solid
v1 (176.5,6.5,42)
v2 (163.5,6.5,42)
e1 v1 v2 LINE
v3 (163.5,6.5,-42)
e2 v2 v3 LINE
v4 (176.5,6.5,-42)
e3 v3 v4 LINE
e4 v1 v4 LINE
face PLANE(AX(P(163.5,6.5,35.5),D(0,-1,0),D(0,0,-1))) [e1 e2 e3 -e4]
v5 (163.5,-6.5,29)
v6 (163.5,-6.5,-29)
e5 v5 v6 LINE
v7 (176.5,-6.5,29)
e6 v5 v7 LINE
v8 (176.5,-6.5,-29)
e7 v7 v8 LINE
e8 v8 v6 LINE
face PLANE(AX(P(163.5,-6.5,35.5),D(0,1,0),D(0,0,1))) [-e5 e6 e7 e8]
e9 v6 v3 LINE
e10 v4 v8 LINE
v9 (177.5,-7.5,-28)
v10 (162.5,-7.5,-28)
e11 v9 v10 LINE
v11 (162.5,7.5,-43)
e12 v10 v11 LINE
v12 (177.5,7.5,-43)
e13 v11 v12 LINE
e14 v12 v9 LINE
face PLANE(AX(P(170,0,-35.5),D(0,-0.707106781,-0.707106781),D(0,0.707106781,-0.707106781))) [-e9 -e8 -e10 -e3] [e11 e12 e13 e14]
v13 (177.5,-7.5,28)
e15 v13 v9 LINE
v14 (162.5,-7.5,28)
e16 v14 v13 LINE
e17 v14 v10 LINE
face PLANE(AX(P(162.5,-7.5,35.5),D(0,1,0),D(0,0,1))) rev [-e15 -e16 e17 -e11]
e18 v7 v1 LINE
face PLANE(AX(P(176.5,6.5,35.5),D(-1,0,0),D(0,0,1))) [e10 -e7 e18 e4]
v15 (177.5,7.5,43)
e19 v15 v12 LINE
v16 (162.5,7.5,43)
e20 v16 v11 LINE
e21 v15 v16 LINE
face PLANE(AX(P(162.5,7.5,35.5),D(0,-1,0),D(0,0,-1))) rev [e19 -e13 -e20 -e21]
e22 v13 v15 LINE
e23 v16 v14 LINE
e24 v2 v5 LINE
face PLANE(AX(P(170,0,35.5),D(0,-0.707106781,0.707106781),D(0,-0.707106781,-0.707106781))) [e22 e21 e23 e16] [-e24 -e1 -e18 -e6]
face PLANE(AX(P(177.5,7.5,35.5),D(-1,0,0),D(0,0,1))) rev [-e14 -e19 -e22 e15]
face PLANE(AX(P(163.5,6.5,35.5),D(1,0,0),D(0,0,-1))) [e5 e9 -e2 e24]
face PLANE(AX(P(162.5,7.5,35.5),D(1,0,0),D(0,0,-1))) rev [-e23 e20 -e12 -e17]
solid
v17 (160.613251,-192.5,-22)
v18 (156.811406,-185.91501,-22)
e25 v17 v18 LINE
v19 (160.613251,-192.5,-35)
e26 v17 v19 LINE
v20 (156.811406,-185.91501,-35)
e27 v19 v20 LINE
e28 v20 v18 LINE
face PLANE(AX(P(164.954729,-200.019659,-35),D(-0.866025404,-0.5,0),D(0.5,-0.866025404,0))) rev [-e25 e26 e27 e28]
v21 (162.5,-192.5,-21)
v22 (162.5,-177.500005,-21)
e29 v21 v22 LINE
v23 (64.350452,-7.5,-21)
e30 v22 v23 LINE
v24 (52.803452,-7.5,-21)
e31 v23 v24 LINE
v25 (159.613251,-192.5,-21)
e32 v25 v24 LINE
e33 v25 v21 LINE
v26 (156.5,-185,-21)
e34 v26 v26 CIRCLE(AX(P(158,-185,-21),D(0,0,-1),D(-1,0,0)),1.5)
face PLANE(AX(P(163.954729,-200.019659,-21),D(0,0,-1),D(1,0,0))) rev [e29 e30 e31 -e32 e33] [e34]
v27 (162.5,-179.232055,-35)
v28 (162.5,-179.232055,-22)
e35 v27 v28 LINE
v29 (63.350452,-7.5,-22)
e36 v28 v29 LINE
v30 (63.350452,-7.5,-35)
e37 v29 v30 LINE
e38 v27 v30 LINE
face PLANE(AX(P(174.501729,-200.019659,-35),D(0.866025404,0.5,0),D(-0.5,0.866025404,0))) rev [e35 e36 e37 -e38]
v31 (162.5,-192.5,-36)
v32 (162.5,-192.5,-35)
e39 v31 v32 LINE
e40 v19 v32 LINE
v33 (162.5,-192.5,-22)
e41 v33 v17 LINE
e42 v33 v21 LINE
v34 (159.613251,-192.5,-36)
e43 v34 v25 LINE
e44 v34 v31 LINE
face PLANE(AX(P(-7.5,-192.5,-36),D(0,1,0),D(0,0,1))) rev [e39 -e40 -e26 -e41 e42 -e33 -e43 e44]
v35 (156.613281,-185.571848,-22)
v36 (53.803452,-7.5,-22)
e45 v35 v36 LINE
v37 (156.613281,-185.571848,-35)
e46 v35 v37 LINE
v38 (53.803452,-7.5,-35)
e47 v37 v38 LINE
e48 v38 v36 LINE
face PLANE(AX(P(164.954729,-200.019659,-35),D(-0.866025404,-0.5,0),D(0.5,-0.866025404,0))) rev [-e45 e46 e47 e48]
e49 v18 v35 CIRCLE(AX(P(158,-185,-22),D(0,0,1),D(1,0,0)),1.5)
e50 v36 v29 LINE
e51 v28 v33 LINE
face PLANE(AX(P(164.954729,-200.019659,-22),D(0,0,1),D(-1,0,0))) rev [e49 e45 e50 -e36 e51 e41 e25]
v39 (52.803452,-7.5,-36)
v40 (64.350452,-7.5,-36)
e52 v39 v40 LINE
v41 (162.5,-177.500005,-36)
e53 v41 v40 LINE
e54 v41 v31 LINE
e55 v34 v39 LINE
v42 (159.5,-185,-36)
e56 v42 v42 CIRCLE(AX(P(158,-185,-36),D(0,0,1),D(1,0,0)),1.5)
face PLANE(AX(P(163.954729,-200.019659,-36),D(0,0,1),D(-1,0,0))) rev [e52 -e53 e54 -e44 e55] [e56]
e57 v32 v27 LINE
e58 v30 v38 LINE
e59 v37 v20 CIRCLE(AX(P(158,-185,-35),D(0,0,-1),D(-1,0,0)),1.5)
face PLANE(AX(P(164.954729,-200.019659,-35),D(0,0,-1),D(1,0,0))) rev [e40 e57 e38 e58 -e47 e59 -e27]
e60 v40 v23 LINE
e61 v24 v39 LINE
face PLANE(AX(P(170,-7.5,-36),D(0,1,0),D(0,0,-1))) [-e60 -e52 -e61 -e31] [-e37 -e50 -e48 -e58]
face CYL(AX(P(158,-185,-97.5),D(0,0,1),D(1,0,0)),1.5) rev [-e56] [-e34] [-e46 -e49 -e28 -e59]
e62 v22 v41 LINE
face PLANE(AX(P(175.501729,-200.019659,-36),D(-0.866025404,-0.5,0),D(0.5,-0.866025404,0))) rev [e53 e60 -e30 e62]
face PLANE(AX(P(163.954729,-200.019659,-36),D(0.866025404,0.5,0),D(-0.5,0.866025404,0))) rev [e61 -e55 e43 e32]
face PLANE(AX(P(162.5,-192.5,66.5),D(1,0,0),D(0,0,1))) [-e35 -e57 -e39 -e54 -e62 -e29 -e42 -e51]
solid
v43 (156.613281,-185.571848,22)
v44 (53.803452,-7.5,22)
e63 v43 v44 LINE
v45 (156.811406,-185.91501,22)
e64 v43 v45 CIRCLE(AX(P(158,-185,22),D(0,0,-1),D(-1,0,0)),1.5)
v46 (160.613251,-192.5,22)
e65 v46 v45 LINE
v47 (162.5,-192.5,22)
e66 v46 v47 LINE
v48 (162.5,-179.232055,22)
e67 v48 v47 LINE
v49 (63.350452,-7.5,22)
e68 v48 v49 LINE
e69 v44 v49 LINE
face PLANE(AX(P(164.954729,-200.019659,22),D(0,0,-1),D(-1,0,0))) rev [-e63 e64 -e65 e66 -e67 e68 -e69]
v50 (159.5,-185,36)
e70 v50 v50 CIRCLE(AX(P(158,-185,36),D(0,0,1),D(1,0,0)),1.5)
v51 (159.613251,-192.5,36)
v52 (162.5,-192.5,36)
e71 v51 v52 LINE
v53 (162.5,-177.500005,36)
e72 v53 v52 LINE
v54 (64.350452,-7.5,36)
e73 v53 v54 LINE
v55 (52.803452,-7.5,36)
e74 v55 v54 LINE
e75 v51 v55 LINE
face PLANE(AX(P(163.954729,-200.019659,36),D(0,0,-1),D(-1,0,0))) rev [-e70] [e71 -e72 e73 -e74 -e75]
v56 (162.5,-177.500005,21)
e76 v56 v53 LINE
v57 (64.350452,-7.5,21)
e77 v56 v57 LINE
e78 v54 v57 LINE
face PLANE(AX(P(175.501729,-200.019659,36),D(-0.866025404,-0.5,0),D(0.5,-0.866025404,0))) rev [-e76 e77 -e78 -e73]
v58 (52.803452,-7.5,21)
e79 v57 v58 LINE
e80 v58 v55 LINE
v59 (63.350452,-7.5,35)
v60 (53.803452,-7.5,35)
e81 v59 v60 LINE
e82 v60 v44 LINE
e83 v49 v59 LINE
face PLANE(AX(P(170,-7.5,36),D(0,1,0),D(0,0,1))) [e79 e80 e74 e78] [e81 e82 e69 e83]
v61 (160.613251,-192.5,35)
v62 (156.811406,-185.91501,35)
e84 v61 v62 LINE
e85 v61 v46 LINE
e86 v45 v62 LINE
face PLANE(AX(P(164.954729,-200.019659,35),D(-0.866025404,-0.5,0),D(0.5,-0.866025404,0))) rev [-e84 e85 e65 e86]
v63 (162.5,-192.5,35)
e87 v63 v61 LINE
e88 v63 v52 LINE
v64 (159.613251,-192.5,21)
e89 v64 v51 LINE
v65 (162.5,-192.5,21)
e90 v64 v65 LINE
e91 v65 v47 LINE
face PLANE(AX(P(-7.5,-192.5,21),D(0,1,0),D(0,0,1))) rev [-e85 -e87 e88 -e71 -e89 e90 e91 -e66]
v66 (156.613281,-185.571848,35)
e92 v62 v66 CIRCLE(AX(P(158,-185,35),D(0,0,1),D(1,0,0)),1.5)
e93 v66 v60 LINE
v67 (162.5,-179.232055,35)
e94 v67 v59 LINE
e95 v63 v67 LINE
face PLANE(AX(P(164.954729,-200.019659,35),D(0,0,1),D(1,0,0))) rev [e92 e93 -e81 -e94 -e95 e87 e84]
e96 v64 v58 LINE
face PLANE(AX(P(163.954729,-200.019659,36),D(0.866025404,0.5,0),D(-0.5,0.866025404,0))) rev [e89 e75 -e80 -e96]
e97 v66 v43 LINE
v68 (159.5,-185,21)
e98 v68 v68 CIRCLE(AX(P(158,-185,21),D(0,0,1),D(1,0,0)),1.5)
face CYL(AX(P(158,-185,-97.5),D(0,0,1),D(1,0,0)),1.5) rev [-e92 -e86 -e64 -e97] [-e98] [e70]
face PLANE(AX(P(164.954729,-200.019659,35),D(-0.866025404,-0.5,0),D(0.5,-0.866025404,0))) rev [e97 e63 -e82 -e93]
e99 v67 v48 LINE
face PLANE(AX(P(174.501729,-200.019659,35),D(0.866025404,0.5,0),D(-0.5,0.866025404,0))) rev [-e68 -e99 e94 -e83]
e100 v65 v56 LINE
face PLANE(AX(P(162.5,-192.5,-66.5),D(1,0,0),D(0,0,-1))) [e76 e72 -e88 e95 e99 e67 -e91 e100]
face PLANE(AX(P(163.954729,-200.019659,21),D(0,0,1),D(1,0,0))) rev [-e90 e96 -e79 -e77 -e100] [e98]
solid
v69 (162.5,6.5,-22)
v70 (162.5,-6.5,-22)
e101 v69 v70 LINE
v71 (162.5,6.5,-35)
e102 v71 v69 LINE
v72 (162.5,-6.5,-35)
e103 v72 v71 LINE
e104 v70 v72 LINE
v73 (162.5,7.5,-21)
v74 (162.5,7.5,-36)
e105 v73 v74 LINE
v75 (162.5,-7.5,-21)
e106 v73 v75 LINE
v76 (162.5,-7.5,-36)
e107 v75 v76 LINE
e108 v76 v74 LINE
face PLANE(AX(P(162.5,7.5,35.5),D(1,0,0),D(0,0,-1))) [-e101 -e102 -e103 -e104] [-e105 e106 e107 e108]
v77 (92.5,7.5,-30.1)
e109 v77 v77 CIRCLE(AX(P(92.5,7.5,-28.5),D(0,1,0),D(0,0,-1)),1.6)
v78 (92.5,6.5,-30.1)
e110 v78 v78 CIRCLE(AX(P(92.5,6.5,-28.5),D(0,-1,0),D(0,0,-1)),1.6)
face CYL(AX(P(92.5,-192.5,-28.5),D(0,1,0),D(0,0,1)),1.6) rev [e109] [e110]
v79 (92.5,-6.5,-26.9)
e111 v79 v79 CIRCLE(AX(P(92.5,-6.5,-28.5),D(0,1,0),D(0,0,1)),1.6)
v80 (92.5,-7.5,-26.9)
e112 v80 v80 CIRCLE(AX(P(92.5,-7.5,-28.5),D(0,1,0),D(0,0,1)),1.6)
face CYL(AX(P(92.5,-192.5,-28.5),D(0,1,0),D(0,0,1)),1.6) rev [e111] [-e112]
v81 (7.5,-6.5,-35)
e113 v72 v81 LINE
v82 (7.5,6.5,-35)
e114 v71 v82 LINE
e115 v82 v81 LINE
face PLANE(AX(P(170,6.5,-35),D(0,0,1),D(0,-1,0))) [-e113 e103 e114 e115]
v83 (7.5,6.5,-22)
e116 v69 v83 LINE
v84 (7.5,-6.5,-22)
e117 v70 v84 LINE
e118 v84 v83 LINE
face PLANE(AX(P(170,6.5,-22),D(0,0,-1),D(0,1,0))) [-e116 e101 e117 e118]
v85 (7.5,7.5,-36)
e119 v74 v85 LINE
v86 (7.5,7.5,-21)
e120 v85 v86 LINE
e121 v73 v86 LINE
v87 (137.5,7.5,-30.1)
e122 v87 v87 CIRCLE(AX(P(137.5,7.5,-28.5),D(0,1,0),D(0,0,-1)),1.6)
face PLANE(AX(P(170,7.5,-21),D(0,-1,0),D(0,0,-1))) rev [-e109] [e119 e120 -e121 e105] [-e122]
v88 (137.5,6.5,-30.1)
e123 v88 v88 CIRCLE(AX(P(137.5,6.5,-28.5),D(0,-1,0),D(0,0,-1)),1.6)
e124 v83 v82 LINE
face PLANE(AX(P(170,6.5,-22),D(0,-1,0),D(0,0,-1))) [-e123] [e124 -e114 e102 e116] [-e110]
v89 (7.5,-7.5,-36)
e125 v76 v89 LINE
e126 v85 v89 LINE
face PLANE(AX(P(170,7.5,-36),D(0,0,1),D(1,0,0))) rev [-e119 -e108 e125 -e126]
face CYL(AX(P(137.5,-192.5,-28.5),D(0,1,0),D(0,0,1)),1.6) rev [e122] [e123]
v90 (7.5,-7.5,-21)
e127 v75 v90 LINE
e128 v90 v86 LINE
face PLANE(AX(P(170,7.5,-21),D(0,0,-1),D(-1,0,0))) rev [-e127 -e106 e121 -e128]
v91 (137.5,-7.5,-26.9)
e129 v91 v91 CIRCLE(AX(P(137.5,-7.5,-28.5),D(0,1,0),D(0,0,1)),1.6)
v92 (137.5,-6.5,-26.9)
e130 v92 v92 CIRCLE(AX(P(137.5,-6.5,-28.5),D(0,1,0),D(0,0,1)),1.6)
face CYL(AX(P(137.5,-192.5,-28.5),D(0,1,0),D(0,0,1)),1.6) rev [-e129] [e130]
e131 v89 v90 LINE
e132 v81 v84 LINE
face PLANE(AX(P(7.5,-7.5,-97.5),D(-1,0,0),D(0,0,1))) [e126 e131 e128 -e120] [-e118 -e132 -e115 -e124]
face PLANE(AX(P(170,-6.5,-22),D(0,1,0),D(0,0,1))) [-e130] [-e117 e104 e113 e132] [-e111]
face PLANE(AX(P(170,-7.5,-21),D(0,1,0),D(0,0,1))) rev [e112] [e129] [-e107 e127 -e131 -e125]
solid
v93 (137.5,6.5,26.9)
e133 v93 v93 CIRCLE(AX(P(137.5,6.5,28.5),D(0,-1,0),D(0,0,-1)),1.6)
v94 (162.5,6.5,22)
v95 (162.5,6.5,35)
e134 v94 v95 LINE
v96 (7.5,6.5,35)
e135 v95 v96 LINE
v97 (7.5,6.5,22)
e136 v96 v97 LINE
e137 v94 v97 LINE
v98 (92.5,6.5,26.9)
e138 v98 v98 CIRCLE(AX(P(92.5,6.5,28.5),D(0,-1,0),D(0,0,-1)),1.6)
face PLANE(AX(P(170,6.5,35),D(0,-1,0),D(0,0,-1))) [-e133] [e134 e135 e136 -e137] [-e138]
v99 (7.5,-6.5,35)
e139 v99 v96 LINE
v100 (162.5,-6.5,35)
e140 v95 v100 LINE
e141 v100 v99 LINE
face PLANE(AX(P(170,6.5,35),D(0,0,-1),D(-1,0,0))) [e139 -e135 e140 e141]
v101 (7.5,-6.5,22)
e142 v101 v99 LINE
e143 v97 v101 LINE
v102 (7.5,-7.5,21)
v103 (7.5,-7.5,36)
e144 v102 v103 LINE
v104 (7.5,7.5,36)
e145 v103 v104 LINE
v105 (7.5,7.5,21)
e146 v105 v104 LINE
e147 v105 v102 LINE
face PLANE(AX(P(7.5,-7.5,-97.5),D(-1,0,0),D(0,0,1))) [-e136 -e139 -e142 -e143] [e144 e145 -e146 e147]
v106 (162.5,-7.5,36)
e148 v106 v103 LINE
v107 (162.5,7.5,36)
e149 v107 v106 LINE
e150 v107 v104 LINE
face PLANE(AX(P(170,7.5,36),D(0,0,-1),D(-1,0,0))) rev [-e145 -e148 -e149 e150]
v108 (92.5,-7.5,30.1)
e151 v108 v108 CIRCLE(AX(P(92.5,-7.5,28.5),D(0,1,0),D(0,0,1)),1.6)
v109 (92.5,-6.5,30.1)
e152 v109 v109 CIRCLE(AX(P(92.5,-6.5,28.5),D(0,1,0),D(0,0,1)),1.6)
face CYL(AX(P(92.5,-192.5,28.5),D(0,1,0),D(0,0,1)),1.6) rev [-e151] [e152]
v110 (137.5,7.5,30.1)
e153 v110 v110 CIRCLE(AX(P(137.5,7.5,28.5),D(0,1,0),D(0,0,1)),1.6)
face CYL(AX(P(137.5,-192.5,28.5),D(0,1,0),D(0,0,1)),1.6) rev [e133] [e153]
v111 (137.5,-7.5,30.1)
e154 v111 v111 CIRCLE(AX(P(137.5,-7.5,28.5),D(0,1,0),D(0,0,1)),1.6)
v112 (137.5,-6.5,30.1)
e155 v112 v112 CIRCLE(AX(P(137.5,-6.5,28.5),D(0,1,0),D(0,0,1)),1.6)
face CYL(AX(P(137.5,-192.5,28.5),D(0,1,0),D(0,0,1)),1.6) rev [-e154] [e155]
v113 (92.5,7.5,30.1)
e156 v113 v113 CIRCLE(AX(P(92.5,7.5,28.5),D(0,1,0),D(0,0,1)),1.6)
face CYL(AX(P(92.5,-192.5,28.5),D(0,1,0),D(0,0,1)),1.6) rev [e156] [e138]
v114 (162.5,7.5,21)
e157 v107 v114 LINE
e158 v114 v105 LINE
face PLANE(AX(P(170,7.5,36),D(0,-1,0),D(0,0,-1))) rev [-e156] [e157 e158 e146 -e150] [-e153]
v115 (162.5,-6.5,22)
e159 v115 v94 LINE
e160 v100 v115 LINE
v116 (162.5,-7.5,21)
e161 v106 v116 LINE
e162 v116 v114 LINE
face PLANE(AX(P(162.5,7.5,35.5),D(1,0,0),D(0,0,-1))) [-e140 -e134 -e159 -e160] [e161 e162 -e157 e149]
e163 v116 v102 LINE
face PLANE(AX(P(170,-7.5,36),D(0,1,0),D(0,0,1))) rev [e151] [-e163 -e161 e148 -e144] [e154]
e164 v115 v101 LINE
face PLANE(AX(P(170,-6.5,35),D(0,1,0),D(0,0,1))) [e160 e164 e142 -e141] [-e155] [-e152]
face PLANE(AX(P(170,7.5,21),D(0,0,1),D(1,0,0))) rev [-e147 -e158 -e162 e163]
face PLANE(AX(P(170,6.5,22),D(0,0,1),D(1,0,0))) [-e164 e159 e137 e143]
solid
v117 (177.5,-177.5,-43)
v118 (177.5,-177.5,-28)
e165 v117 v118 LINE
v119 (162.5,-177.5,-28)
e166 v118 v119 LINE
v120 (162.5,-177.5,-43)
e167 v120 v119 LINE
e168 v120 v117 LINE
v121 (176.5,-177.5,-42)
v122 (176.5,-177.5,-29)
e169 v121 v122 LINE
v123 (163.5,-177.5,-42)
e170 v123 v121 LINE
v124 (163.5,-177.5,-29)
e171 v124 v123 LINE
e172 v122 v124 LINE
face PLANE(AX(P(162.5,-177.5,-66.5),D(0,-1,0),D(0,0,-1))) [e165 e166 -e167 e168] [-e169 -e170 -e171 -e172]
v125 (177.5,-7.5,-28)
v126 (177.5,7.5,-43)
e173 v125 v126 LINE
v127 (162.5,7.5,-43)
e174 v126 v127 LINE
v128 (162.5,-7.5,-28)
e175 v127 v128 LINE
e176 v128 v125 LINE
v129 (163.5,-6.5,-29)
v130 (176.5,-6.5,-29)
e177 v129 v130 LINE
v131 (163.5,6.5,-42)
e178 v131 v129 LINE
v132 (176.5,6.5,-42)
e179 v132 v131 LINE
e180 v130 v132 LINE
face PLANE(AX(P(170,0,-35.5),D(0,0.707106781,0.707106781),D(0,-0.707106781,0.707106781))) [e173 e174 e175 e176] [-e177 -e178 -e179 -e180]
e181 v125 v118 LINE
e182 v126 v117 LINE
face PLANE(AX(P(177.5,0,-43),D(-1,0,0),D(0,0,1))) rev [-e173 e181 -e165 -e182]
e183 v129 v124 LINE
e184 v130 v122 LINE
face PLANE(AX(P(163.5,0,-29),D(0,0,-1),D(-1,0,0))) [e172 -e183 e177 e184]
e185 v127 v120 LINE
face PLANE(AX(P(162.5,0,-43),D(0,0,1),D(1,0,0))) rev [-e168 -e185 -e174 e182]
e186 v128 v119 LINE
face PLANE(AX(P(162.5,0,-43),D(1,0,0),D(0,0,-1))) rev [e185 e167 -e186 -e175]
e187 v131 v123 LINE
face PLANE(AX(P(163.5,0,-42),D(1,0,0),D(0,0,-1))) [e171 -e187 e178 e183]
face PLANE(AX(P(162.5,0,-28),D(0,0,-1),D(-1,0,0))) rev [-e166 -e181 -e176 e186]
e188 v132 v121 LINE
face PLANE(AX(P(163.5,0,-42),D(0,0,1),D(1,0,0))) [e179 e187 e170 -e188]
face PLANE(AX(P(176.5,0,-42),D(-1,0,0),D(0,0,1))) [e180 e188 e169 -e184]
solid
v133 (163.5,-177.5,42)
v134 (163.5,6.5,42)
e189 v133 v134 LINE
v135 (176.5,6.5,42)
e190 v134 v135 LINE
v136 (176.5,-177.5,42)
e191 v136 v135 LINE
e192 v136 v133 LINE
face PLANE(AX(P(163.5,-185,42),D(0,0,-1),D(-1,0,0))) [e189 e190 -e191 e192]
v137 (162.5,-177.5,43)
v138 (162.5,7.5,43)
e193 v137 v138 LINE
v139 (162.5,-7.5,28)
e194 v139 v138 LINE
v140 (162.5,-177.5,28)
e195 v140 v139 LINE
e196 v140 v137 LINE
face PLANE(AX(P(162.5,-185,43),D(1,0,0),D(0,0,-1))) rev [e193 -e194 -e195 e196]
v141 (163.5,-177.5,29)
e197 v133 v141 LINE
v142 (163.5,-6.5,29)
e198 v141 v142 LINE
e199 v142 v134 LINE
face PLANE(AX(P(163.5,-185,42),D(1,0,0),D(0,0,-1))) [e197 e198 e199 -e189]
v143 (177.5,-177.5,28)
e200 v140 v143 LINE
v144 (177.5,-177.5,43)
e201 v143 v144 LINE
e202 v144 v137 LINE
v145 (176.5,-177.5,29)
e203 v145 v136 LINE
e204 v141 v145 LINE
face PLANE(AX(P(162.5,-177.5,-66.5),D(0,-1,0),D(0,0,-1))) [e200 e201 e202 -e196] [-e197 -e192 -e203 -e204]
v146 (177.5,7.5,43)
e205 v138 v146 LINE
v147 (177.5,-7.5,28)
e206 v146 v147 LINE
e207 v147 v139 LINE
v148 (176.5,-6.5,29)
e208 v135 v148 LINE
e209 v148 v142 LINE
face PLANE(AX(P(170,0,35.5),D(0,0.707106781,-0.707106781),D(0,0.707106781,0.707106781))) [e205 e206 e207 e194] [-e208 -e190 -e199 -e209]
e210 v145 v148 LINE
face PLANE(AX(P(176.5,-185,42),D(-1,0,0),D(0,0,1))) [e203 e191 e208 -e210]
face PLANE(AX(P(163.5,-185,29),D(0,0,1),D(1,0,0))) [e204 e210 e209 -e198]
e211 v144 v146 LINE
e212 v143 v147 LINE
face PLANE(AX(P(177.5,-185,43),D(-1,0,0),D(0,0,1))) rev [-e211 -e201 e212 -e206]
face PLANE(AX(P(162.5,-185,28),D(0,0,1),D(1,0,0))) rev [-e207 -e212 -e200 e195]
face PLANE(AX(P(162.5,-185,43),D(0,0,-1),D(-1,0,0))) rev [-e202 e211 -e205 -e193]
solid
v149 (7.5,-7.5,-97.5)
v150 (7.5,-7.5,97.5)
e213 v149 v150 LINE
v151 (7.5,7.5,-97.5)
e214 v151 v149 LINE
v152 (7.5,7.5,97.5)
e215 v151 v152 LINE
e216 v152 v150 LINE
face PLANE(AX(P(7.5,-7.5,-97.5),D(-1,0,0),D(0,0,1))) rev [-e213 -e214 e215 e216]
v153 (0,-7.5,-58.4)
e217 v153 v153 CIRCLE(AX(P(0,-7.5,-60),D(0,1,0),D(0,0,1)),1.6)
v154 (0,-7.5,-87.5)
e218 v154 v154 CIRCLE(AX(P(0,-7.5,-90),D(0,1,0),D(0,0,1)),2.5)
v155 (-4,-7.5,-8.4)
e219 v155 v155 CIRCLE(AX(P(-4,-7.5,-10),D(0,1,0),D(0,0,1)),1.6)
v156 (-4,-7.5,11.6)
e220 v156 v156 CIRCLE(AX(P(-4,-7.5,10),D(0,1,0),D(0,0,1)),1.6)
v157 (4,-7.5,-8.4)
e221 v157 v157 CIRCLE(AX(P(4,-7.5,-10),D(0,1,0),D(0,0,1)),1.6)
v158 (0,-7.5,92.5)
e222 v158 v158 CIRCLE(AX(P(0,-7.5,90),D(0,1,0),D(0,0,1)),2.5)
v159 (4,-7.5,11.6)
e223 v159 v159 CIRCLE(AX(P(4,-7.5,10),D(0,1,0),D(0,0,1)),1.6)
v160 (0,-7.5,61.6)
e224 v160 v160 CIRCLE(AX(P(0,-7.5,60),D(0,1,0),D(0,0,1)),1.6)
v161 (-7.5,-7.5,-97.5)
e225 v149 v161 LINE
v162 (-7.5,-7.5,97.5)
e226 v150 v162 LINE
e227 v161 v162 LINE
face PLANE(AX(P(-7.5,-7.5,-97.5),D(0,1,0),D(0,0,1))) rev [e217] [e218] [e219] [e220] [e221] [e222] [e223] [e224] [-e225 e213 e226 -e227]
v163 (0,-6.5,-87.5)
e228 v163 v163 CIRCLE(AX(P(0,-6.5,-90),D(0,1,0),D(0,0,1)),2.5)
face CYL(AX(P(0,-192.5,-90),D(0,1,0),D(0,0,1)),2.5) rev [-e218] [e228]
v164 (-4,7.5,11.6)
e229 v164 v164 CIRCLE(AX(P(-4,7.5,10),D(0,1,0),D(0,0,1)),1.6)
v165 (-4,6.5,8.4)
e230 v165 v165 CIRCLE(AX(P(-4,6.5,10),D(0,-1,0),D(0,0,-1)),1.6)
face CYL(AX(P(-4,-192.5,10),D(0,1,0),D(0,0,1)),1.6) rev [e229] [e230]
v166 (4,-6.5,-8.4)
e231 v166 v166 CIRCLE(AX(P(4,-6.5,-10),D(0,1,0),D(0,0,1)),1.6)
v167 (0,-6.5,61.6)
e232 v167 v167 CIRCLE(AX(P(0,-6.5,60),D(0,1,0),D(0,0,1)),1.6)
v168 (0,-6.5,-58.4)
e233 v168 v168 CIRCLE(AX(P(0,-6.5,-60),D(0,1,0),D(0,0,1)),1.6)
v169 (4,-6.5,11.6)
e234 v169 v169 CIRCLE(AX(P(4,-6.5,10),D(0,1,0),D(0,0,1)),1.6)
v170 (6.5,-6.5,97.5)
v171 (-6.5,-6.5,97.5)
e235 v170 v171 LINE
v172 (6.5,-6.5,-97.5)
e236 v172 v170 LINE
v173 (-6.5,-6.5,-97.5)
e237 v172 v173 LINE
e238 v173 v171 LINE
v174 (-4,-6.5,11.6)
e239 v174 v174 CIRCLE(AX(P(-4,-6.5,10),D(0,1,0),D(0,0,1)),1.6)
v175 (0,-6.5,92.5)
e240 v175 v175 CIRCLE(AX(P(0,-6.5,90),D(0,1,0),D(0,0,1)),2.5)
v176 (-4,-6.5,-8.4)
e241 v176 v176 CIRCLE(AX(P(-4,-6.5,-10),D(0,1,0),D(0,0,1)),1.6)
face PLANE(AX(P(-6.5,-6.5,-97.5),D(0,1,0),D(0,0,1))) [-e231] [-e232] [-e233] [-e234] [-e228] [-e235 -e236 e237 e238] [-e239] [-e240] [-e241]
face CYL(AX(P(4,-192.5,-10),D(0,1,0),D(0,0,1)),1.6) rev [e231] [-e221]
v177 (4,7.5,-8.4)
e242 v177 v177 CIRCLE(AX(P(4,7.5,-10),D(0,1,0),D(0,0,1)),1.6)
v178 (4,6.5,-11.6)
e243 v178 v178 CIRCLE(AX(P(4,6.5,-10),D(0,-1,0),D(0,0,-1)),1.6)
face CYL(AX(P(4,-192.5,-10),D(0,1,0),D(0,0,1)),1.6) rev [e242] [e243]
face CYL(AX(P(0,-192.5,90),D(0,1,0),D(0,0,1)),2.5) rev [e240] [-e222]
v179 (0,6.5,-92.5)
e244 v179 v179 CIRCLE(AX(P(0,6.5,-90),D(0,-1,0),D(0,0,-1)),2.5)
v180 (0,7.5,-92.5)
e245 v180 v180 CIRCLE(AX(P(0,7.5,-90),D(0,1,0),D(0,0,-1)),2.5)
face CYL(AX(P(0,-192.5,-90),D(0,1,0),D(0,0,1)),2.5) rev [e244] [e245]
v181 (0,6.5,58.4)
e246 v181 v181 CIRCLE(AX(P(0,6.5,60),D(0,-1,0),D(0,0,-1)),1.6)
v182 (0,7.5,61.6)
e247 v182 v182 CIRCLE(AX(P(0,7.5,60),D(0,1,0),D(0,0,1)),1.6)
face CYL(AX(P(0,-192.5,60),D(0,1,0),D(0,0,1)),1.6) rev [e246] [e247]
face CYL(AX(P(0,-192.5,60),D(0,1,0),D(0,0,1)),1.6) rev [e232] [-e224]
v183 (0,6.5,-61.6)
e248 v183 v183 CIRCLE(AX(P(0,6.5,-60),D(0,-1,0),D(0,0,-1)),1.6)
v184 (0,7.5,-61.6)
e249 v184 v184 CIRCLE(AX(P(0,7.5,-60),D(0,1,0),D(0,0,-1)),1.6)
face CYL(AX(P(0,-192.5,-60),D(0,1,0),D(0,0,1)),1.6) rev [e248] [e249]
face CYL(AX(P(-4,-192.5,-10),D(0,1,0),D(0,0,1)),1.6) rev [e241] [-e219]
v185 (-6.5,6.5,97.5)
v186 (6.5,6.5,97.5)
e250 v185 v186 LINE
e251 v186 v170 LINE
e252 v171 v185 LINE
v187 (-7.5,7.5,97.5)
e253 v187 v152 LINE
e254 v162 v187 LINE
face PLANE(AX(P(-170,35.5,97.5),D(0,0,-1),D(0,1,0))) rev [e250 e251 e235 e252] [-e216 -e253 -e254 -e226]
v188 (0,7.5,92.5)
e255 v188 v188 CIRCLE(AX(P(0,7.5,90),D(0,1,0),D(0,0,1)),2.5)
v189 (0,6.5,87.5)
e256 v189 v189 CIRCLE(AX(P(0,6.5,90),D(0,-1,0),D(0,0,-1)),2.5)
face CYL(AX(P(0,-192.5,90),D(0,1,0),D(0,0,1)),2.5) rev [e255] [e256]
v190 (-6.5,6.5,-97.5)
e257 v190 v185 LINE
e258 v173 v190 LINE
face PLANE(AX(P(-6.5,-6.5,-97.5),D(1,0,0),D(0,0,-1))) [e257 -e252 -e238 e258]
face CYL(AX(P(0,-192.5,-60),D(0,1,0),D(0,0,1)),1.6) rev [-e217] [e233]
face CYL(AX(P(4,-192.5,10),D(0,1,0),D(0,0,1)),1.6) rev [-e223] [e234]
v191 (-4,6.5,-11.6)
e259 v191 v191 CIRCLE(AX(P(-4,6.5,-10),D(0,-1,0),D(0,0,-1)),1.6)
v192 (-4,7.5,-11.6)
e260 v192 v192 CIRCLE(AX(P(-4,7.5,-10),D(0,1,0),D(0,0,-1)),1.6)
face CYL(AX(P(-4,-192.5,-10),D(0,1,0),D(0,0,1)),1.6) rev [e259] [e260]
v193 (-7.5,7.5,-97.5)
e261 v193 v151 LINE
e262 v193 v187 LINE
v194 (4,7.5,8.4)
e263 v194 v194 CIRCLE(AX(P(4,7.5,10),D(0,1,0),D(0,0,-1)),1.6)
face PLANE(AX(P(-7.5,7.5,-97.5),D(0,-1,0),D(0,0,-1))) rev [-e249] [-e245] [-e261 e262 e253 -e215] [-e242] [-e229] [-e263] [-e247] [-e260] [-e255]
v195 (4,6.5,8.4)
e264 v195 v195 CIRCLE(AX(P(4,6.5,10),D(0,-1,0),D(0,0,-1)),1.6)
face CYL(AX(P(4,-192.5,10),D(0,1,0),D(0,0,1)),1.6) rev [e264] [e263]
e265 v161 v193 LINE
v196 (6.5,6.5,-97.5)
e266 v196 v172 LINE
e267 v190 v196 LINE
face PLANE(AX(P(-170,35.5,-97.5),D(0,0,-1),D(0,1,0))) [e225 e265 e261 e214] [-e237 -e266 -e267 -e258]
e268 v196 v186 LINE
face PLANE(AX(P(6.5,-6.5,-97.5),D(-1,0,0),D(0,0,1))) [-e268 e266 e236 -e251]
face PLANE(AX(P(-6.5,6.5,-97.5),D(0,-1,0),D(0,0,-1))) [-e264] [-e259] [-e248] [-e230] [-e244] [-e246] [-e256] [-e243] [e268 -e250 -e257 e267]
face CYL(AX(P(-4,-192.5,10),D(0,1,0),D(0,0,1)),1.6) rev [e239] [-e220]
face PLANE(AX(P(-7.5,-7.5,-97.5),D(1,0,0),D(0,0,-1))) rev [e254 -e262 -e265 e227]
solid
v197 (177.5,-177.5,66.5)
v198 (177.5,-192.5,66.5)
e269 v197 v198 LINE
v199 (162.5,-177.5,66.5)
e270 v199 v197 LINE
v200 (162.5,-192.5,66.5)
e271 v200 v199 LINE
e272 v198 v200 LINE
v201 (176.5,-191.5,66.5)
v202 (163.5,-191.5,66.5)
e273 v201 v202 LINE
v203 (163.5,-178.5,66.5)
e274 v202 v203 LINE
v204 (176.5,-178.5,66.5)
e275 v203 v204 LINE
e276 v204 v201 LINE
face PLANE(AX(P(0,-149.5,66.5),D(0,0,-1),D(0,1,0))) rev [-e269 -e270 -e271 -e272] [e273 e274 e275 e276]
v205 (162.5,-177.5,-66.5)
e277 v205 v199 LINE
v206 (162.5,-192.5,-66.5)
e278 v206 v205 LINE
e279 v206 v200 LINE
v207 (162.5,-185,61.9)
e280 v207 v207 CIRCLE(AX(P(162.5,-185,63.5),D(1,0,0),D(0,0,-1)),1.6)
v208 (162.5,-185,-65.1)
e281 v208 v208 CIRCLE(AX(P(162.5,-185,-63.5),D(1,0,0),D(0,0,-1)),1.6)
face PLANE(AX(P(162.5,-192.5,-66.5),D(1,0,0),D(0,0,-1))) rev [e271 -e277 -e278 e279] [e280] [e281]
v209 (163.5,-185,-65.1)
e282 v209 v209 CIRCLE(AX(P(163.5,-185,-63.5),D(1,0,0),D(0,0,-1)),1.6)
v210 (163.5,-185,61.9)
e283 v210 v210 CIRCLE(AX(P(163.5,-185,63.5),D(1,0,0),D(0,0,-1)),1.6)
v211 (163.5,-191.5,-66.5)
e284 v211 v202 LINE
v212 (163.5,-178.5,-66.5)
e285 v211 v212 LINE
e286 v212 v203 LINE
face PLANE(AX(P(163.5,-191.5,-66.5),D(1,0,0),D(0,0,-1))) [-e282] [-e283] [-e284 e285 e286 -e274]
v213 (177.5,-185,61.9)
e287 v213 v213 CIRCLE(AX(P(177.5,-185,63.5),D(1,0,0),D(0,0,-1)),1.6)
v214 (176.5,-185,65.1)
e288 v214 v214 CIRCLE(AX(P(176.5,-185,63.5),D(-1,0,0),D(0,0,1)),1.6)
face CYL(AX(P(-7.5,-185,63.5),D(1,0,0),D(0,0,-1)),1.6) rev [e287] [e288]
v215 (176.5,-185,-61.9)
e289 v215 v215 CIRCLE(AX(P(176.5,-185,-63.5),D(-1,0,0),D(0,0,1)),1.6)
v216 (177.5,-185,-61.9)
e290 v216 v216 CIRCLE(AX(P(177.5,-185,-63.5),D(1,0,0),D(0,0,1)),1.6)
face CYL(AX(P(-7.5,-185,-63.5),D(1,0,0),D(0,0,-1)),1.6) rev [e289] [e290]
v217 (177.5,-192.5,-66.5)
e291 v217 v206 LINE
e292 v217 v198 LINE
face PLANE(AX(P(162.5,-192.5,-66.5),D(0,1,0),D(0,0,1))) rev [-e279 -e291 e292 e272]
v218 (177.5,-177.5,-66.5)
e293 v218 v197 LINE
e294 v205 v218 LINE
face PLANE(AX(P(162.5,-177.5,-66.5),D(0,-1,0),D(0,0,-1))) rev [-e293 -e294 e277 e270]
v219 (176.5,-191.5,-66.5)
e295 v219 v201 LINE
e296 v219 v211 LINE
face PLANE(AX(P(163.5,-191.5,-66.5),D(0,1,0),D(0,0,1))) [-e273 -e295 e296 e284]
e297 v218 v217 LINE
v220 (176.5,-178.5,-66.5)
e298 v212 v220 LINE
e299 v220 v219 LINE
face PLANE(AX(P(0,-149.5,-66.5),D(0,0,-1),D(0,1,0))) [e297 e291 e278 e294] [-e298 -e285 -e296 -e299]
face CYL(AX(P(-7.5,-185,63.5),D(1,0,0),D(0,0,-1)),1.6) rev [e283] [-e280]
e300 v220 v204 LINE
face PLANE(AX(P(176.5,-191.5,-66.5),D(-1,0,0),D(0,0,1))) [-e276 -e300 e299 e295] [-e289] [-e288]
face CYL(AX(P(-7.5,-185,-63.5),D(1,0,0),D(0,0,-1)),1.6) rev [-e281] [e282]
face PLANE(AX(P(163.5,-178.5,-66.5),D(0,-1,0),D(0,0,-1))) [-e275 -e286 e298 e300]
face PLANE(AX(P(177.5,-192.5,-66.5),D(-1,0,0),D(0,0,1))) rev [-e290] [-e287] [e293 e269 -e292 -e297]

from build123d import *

# Parameters (mm, degrees)
SKETCH1_ON_SEGMENT_1_W       = 15
SKETCH1_ON_SEGMENT_1_H       = 15
SKETCH1_ON_SEGMENT_1_W_2     = 13
SKETCH1_ON_SEGMENT_1_H_2     = 13
F_20_X_20_X_2_1_DEPTH        = 197.606601718
SKETCH1_ON_SEGMENT_2_W       = 15
SKETCH1_ON_SEGMENT_2_H       = 15
SKETCH1_ON_SEGMENT_2_W_2     = 13
SKETCH1_ON_SEGMENT_2_H_2     = 13
F_20_X_20_X_2_1_2_DEPTH      = 94.213203436
F_20_X_20_X_2_1_3_DEPTH      = 186
F_20_X_20_X_2_1_3_DEPTH_BACK = 11.606601718
SKETCH1_W                    = 15
SKETCH1_H                    = 15
SKETCH1_W_2                  = 13
SKETCH1_H_2                  = 13
SKETCH1_ON_SEGMENT_4_W       = 15
SKETCH1_ON_SEGMENT_4_H       = 15
SKETCH1_ON_SEGMENT_4_W_2     = 13
SKETCH1_ON_SEGMENT_4_H_2     = 13
F_20_X_20_X_2_1_4_DEPTH      = 133
SKETCH1_ON_SEGMENT_5_W       = 15
SKETCH1_ON_SEGMENT_5_H       = 15
SKETCH1_ON_SEGMENT_5_W_2     = 13
SKETCH1_ON_SEGMENT_5_H_2     = 13
F_20_X_20_X_2_1_5_DEPTH      = 195
SKETCH1_ON_SEGMENT_6_W       = 15
SKETCH1_ON_SEGMENT_6_H       = 15
SKETCH1_ON_SEGMENT_6_W_2     = 13
SKETCH1_ON_SEGMENT_6_H_2     = 13
F_20_X_20_X_2_1_6_DEPTH      = 172
SKETCH1_ON_SEGMENT_7_W       = 15
SKETCH1_ON_SEGMENT_7_H       = 15
SKETCH1_ON_SEGMENT_7_W_2     = 13
SKETCH1_ON_SEGMENT_7_H_2     = 13
F_20_X_20_X_2_1_7_DEPTH      = 172
SKETCH_2_R                   = 2.5
SKETCH_2_R_2                 = 1.6
CUT_EXTRUDE_1_DEPTH          = 285.62694883
SWEEP_START                  = 21
SWEEP_1_DEPTH                = 15
SWEEP_1_2_DEPTH              = 1
SWEEP_START_2                = 35
SWEEP_1_3_DEPTH              = 1
SKETCH_6_R                   = 1.5
CUT_EXTRUDE_2_DEPTH          = 298.211621842
SKETCH_7_W                   = 15
SKETCH_7_H                   = 4.999995337
CUT_EXTRUDE_3_DEPTH          = 279.231015809
SKETCH_8_R                   = 1.6
CUT_EXTRUDE_4_DEPTH          = 285.231419797


# Read off the part's stored shape, not the designer's step: 扫描1
with BuildPart() as part:
    # Sketch1 on segment 1 (carried to segment 1) → 方形管 20 X 20 X 2(1) (new body)
    with BuildSketch(Plane(origin=(170, -186, -35.5), x_dir=(1, 0, 0), z_dir=(0, 1, 0))):
        Rectangle(SKETCH1_ON_SEGMENT_1_W, SKETCH1_ON_SEGMENT_1_H)
        Rectangle(SKETCH1_ON_SEGMENT_1_W_2, SKETCH1_ON_SEGMENT_1_H_2, mode=Mode.SUBTRACT)
    extrude(amount=F_20_X_20_X_2_1_DEPTH)

    # 方形管 20 X 20 X 2(1) mitre 1
    split(bisect_by=Plane(origin=(170, 0, -35.5), x_dir=(1, 0, 0), z_dir=(0, -0.707106781, -0.707106781)), keep=Keep.TOP)

    # 方形管 20 X 20 X 2(1) mitre 2
    split(bisect_by=Plane(origin=(170, -177.5, -35.5), x_dir=(-1, 0, 0), z_dir=(0, 1, 0)), keep=Keep.TOP)


with BuildPart() as body_2:
    # Sketch1 on segment 2 (carried to segment 2) → 20 X 20 X 2_1 2 (new body)
    with BuildSketch(Plane(origin=(170, 0, -47.106601718), x_dir=(1, 0, 0), z_dir=(0, 0, 1))):
        Rectangle(SKETCH1_ON_SEGMENT_2_W, SKETCH1_ON_SEGMENT_2_H)
        Rectangle(SKETCH1_ON_SEGMENT_2_W_2, SKETCH1_ON_SEGMENT_2_H_2, mode=Mode.SUBTRACT)
    extrude(amount=F_20_X_20_X_2_1_2_DEPTH)

    # 20 X 20 X 2_1 2 mitre 1
    split(bisect_by=Plane(origin=(170, 0, 35.5), x_dir=(-1, 0, 0), z_dir=(0, 0.707106781, -0.707106781)), keep=Keep.TOP)

    # 20 X 20 X 2_1 2 mitre 2
    split(bisect_by=Plane(origin=(170, 0, -35.5), x_dir=(-1, 0, 0), z_dir=(0, 0.707106781, 0.707106781)), keep=Keep.TOP)


with BuildPart() as body_3:
    # Sketch1 → 20 X 20 X 2_1 3 (new, two sides: drawn at the far end of the back side and taken through both)
    with BuildSketch(Plane(origin=(170, 0, 35.5), x_dir=(1, 0, 0), z_dir=(0, -1, 0)).offset(-F_20_X_20_X_2_1_3_DEPTH_BACK)):
        Rectangle(SKETCH1_W, SKETCH1_H)
        Rectangle(SKETCH1_W_2, SKETCH1_H_2, mode=Mode.SUBTRACT)
    extrude(amount=F_20_X_20_X_2_1_3_DEPTH + F_20_X_20_X_2_1_3_DEPTH_BACK)

    # 20 X 20 X 2_1 3 mitre 1
    split(bisect_by=Plane(origin=(170, 0, 35.5), x_dir=(1, 0, 0), z_dir=(0, -0.707106781, 0.707106781)), keep=Keep.TOP)

    # 20 X 20 X 2_1 3 mitre 2
    split(bisect_by=Plane(origin=(170, -177.5, 35.5), x_dir=(-1, 0, 0), z_dir=(0, 1, 0)), keep=Keep.TOP)


with BuildPart() as body_4:
    # Sketch1 on segment 4 (carried to segment 4) → 20 X 20 X 2_1 4 (new body)
    with BuildSketch(Plane(origin=(170, -185, 66.5), x_dir=(1, 0, 0), z_dir=(0, 0, -1))):
        Rectangle(SKETCH1_ON_SEGMENT_4_W, SKETCH1_ON_SEGMENT_4_H)
        Rectangle(SKETCH1_ON_SEGMENT_4_W_2, SKETCH1_ON_SEGMENT_4_H_2, mode=Mode.SUBTRACT)
    extrude(amount=F_20_X_20_X_2_1_4_DEPTH)

    # 草图8 → 切除-拉伸4 (cut, through all)
    with BuildSketch(Plane(origin=(177.5, 0, 0), x_dir=(0, 0, -1), z_dir=(1, 0, 0))):
        with Locations((-63.5, -185)):
            Circle(SKETCH_8_R)
        with Locations(Location((63.5, -185, 0), (0, 0, 180))):
            Circle(SKETCH_8_R)
    extrude(amount=-CUT_EXTRUDE_4_DEPTH, mode=Mode.SUBTRACT)


with BuildPart() as body_5:
    # Sketch1 on segment 5 (carried to segment 5) → 20 X 20 X 2_1 5 (new body)
    with BuildSketch(Plane.XY.offset(-97.5)):
        Rectangle(SKETCH1_ON_SEGMENT_5_W, SKETCH1_ON_SEGMENT_5_H)
        Rectangle(SKETCH1_ON_SEGMENT_5_W_2, SKETCH1_ON_SEGMENT_5_H_2, mode=Mode.SUBTRACT)
    extrude(amount=F_20_X_20_X_2_1_5_DEPTH)


with BuildPart() as body_6:
    # Sketch1 on segment 6 (carried to segment 6) → 20 X 20 X 2_1 6 (new body)
    with BuildSketch(Plane(origin=(-1, 0, 28.5), x_dir=(0, 1, 0), z_dir=(1, 0, 0))):
        Rectangle(SKETCH1_ON_SEGMENT_6_W, SKETCH1_ON_SEGMENT_6_H)
        Rectangle(SKETCH1_ON_SEGMENT_6_W_2, SKETCH1_ON_SEGMENT_6_H_2, mode=Mode.SUBTRACT)
    extrude(amount=F_20_X_20_X_2_1_6_DEPTH)

    # 20 X 20 X 2_1 6 mitre 1
    split(bisect_by=Plane(origin=(7.5, 0, 28.5), x_dir=(0, 1, 0), z_dir=(1, 0, 0)), keep=Keep.TOP)

    # 20 X 20 X 2_1 6 mitre 2
    split(bisect_by=Plane(origin=(162.5, 0, 28.5), x_dir=(0, -1, 0), z_dir=(-1, 0, 0)), keep=Keep.TOP)


with BuildPart() as body_7:
    # Sketch1 on segment 7 (carried to segment 7) → 20 X 20 X 2_1 7 (new body)
    with BuildSketch(Plane(origin=(-1, 0, -28.5), x_dir=(0, 1, 0), z_dir=(1, 0, 0))):
        Rectangle(SKETCH1_ON_SEGMENT_7_W, SKETCH1_ON_SEGMENT_7_H)
        Rectangle(SKETCH1_ON_SEGMENT_7_W_2, SKETCH1_ON_SEGMENT_7_H_2, mode=Mode.SUBTRACT)
    extrude(amount=F_20_X_20_X_2_1_7_DEPTH)

    # 20 X 20 X 2_1 7 mitre 1
    split(bisect_by=Plane(origin=(7.5, 0, -28.5), x_dir=(0, 1, 0), z_dir=(1, 0, 0)), keep=Keep.TOP)

    # 20 X 20 X 2_1 7 mitre 2
    split(bisect_by=Plane(origin=(162.5, 0, -28.5), x_dir=(0, -1, 0), z_dir=(-1, 0, 0)), keep=Keep.TOP)


with BuildPart() as cut_extrude_1_tool:
    # 草图2 → 切除-拉伸1 (new, through all)
    with BuildSketch(Plane(origin=(0, 7.5, 0), x_dir=(1, 0, 0), z_dir=(0, 1, 0))):
        with Locations(Location((0, -90, 0), (0, 0, 270))):
            Circle(SKETCH_2_R)
        with Locations(Location((0, 90, 0), (0, 0, 90))):
            Circle(SKETCH_2_R)
        with Locations(Location((92.5, -28.5, 0), (0, 0, 270))):
            Circle(SKETCH_2_R_2)
        with Locations(Location((92.5, 28.5, 0), (0, 0, 90))):
            Circle(SKETCH_2_R_2)
        with Locations(Location((4, 10, 0), (0, 0, 270))):
            Circle(SKETCH_2_R_2)
        with Locations(Location((-4, 10, 0), (0, 0, 90))):
            Circle(SKETCH_2_R_2)
        with Locations(Location((4, -10, 0), (0, 0, 90))):
            Circle(SKETCH_2_R_2)
        with Locations(Location((-4, -10, 0), (0, 0, 270))):
            Circle(SKETCH_2_R_2)
        with Locations(Location((0, -60, 0), (0, 0, 270))):
            Circle(SKETCH_2_R_2)
        with Locations(Location((0, 60, 0), (0, 0, 90))):
            Circle(SKETCH_2_R_2)
        with Locations(Location((137.5, -28.5, 0), (0, 0, 270))):
            Circle(SKETCH_2_R_2)
        with Locations(Location((137.5, 28.5, 0), (0, 0, 90))):
            Circle(SKETCH_2_R_2)
    extrude(amount=-CUT_EXTRUDE_1_DEPTH)


with BuildPart() as body_5_1:
    add(body_5.part)

    # 切除-拉伸1: cut by cut_extrude_1_tool
    add(cut_extrude_1_tool.part, mode=Mode.SUBTRACT)


with BuildPart() as body_6_1:
    add(body_6.part)

    # 切除-拉伸1: cut by cut_extrude_1_tool
    add(cut_extrude_1_tool.part, mode=Mode.SUBTRACT)


with BuildPart() as body_7_1:
    add(body_7.part)

    # 切除-拉伸1: cut by cut_extrude_1_tool
    add(cut_extrude_1_tool.part, mode=Mode.SUBTRACT)


with BuildPart() as body_8:
    # 扫描1 outline → 扫描1 (new body)
    with BuildSketch(Plane.XY.offset(SWEEP_START)):
        Polygon((52.803451546, -7.5), (162.5, -197.499995337), (162.5, -195.76794453), (53.803451546, -7.5), align=None)
        Polygon((63.350451546, -7.5), (162.5, -179.23205547), (162.5, -177.500004663), (64.350451546, -7.5), align=None)
    extrude(amount=SWEEP_1_DEPTH)

    # Sweep 1 2 outline → Sweep 1 2 (add)
    with BuildSketch(Plane.XY.offset(SWEEP_START)):
        Polygon((53.803451546, -7.5), (162.5, -195.76794453), (162.5, -179.23205547), (63.350451546, -7.5), align=None)
    extrude(amount=SWEEP_1_2_DEPTH)

    # Sweep 1 3 outline → Sweep 1 3 (add)
    with BuildSketch(Plane.XY.offset(SWEEP_START_2)):
        Polygon((53.803451546, -7.5), (162.5, -195.76794453), (162.5, -179.23205547), (63.350451546, -7.5), align=None)
    extrude(amount=SWEEP_1_3_DEPTH)


with BuildPart() as body_9:
    # 镜向1: mirrored copy
    add(body_8.part.mirror(Plane.XY))


with BuildPart() as cut_extrude_2_tool:
    # 草图6 → 切除-拉伸2 (new, through all)
    with BuildSketch(Plane.XY.offset(36)):
        with Locations((158, -185)):
            Circle(SKETCH_6_R)
    extrude(amount=-CUT_EXTRUDE_2_DEPTH)


with BuildPart() as body_8_1:
    add(body_8.part)

    # 切除-拉伸2: cut by cut_extrude_2_tool
    add(cut_extrude_2_tool.part, mode=Mode.SUBTRACT)


with BuildPart() as body_9_1:
    add(body_9.part)

    # 切除-拉伸2: cut by cut_extrude_2_tool
    add(cut_extrude_2_tool.part, mode=Mode.SUBTRACT)


with BuildPart() as cut_extrude_3_tool:
    # 草图7 → 切除-拉伸3 (new, through all)
    with BuildSketch(Plane(origin=(162.5, 0, 0), x_dir=(0, 0, -1), z_dir=(1, 0, 0))):
        with Locations((-28.5, -194.999997668)):
            Rectangle(SKETCH_7_W, SKETCH_7_H)
        with Locations((28.5, -194.999997668)):
            Rectangle(SKETCH_7_W, SKETCH_7_H)
    extrude(amount=-CUT_EXTRUDE_3_DEPTH)


with BuildPart() as body_8_2:
    add(body_8_1.part)

    # 切除-拉伸3: cut by cut_extrude_3_tool
    add(cut_extrude_3_tool.part, mode=Mode.SUBTRACT)


with BuildPart() as body_9_2:
    add(body_9_1.part)

    # 切除-拉伸3: cut by cut_extrude_3_tool
    add(cut_extrude_3_tool.part, mode=Mode.SUBTRACT)


solid = Compound([part.part, body_2.part, body_3.part, body_4.part, body_5_1.part, body_6_1.part, body_7_1.part, body_8_2.part, body_9_2.part])
